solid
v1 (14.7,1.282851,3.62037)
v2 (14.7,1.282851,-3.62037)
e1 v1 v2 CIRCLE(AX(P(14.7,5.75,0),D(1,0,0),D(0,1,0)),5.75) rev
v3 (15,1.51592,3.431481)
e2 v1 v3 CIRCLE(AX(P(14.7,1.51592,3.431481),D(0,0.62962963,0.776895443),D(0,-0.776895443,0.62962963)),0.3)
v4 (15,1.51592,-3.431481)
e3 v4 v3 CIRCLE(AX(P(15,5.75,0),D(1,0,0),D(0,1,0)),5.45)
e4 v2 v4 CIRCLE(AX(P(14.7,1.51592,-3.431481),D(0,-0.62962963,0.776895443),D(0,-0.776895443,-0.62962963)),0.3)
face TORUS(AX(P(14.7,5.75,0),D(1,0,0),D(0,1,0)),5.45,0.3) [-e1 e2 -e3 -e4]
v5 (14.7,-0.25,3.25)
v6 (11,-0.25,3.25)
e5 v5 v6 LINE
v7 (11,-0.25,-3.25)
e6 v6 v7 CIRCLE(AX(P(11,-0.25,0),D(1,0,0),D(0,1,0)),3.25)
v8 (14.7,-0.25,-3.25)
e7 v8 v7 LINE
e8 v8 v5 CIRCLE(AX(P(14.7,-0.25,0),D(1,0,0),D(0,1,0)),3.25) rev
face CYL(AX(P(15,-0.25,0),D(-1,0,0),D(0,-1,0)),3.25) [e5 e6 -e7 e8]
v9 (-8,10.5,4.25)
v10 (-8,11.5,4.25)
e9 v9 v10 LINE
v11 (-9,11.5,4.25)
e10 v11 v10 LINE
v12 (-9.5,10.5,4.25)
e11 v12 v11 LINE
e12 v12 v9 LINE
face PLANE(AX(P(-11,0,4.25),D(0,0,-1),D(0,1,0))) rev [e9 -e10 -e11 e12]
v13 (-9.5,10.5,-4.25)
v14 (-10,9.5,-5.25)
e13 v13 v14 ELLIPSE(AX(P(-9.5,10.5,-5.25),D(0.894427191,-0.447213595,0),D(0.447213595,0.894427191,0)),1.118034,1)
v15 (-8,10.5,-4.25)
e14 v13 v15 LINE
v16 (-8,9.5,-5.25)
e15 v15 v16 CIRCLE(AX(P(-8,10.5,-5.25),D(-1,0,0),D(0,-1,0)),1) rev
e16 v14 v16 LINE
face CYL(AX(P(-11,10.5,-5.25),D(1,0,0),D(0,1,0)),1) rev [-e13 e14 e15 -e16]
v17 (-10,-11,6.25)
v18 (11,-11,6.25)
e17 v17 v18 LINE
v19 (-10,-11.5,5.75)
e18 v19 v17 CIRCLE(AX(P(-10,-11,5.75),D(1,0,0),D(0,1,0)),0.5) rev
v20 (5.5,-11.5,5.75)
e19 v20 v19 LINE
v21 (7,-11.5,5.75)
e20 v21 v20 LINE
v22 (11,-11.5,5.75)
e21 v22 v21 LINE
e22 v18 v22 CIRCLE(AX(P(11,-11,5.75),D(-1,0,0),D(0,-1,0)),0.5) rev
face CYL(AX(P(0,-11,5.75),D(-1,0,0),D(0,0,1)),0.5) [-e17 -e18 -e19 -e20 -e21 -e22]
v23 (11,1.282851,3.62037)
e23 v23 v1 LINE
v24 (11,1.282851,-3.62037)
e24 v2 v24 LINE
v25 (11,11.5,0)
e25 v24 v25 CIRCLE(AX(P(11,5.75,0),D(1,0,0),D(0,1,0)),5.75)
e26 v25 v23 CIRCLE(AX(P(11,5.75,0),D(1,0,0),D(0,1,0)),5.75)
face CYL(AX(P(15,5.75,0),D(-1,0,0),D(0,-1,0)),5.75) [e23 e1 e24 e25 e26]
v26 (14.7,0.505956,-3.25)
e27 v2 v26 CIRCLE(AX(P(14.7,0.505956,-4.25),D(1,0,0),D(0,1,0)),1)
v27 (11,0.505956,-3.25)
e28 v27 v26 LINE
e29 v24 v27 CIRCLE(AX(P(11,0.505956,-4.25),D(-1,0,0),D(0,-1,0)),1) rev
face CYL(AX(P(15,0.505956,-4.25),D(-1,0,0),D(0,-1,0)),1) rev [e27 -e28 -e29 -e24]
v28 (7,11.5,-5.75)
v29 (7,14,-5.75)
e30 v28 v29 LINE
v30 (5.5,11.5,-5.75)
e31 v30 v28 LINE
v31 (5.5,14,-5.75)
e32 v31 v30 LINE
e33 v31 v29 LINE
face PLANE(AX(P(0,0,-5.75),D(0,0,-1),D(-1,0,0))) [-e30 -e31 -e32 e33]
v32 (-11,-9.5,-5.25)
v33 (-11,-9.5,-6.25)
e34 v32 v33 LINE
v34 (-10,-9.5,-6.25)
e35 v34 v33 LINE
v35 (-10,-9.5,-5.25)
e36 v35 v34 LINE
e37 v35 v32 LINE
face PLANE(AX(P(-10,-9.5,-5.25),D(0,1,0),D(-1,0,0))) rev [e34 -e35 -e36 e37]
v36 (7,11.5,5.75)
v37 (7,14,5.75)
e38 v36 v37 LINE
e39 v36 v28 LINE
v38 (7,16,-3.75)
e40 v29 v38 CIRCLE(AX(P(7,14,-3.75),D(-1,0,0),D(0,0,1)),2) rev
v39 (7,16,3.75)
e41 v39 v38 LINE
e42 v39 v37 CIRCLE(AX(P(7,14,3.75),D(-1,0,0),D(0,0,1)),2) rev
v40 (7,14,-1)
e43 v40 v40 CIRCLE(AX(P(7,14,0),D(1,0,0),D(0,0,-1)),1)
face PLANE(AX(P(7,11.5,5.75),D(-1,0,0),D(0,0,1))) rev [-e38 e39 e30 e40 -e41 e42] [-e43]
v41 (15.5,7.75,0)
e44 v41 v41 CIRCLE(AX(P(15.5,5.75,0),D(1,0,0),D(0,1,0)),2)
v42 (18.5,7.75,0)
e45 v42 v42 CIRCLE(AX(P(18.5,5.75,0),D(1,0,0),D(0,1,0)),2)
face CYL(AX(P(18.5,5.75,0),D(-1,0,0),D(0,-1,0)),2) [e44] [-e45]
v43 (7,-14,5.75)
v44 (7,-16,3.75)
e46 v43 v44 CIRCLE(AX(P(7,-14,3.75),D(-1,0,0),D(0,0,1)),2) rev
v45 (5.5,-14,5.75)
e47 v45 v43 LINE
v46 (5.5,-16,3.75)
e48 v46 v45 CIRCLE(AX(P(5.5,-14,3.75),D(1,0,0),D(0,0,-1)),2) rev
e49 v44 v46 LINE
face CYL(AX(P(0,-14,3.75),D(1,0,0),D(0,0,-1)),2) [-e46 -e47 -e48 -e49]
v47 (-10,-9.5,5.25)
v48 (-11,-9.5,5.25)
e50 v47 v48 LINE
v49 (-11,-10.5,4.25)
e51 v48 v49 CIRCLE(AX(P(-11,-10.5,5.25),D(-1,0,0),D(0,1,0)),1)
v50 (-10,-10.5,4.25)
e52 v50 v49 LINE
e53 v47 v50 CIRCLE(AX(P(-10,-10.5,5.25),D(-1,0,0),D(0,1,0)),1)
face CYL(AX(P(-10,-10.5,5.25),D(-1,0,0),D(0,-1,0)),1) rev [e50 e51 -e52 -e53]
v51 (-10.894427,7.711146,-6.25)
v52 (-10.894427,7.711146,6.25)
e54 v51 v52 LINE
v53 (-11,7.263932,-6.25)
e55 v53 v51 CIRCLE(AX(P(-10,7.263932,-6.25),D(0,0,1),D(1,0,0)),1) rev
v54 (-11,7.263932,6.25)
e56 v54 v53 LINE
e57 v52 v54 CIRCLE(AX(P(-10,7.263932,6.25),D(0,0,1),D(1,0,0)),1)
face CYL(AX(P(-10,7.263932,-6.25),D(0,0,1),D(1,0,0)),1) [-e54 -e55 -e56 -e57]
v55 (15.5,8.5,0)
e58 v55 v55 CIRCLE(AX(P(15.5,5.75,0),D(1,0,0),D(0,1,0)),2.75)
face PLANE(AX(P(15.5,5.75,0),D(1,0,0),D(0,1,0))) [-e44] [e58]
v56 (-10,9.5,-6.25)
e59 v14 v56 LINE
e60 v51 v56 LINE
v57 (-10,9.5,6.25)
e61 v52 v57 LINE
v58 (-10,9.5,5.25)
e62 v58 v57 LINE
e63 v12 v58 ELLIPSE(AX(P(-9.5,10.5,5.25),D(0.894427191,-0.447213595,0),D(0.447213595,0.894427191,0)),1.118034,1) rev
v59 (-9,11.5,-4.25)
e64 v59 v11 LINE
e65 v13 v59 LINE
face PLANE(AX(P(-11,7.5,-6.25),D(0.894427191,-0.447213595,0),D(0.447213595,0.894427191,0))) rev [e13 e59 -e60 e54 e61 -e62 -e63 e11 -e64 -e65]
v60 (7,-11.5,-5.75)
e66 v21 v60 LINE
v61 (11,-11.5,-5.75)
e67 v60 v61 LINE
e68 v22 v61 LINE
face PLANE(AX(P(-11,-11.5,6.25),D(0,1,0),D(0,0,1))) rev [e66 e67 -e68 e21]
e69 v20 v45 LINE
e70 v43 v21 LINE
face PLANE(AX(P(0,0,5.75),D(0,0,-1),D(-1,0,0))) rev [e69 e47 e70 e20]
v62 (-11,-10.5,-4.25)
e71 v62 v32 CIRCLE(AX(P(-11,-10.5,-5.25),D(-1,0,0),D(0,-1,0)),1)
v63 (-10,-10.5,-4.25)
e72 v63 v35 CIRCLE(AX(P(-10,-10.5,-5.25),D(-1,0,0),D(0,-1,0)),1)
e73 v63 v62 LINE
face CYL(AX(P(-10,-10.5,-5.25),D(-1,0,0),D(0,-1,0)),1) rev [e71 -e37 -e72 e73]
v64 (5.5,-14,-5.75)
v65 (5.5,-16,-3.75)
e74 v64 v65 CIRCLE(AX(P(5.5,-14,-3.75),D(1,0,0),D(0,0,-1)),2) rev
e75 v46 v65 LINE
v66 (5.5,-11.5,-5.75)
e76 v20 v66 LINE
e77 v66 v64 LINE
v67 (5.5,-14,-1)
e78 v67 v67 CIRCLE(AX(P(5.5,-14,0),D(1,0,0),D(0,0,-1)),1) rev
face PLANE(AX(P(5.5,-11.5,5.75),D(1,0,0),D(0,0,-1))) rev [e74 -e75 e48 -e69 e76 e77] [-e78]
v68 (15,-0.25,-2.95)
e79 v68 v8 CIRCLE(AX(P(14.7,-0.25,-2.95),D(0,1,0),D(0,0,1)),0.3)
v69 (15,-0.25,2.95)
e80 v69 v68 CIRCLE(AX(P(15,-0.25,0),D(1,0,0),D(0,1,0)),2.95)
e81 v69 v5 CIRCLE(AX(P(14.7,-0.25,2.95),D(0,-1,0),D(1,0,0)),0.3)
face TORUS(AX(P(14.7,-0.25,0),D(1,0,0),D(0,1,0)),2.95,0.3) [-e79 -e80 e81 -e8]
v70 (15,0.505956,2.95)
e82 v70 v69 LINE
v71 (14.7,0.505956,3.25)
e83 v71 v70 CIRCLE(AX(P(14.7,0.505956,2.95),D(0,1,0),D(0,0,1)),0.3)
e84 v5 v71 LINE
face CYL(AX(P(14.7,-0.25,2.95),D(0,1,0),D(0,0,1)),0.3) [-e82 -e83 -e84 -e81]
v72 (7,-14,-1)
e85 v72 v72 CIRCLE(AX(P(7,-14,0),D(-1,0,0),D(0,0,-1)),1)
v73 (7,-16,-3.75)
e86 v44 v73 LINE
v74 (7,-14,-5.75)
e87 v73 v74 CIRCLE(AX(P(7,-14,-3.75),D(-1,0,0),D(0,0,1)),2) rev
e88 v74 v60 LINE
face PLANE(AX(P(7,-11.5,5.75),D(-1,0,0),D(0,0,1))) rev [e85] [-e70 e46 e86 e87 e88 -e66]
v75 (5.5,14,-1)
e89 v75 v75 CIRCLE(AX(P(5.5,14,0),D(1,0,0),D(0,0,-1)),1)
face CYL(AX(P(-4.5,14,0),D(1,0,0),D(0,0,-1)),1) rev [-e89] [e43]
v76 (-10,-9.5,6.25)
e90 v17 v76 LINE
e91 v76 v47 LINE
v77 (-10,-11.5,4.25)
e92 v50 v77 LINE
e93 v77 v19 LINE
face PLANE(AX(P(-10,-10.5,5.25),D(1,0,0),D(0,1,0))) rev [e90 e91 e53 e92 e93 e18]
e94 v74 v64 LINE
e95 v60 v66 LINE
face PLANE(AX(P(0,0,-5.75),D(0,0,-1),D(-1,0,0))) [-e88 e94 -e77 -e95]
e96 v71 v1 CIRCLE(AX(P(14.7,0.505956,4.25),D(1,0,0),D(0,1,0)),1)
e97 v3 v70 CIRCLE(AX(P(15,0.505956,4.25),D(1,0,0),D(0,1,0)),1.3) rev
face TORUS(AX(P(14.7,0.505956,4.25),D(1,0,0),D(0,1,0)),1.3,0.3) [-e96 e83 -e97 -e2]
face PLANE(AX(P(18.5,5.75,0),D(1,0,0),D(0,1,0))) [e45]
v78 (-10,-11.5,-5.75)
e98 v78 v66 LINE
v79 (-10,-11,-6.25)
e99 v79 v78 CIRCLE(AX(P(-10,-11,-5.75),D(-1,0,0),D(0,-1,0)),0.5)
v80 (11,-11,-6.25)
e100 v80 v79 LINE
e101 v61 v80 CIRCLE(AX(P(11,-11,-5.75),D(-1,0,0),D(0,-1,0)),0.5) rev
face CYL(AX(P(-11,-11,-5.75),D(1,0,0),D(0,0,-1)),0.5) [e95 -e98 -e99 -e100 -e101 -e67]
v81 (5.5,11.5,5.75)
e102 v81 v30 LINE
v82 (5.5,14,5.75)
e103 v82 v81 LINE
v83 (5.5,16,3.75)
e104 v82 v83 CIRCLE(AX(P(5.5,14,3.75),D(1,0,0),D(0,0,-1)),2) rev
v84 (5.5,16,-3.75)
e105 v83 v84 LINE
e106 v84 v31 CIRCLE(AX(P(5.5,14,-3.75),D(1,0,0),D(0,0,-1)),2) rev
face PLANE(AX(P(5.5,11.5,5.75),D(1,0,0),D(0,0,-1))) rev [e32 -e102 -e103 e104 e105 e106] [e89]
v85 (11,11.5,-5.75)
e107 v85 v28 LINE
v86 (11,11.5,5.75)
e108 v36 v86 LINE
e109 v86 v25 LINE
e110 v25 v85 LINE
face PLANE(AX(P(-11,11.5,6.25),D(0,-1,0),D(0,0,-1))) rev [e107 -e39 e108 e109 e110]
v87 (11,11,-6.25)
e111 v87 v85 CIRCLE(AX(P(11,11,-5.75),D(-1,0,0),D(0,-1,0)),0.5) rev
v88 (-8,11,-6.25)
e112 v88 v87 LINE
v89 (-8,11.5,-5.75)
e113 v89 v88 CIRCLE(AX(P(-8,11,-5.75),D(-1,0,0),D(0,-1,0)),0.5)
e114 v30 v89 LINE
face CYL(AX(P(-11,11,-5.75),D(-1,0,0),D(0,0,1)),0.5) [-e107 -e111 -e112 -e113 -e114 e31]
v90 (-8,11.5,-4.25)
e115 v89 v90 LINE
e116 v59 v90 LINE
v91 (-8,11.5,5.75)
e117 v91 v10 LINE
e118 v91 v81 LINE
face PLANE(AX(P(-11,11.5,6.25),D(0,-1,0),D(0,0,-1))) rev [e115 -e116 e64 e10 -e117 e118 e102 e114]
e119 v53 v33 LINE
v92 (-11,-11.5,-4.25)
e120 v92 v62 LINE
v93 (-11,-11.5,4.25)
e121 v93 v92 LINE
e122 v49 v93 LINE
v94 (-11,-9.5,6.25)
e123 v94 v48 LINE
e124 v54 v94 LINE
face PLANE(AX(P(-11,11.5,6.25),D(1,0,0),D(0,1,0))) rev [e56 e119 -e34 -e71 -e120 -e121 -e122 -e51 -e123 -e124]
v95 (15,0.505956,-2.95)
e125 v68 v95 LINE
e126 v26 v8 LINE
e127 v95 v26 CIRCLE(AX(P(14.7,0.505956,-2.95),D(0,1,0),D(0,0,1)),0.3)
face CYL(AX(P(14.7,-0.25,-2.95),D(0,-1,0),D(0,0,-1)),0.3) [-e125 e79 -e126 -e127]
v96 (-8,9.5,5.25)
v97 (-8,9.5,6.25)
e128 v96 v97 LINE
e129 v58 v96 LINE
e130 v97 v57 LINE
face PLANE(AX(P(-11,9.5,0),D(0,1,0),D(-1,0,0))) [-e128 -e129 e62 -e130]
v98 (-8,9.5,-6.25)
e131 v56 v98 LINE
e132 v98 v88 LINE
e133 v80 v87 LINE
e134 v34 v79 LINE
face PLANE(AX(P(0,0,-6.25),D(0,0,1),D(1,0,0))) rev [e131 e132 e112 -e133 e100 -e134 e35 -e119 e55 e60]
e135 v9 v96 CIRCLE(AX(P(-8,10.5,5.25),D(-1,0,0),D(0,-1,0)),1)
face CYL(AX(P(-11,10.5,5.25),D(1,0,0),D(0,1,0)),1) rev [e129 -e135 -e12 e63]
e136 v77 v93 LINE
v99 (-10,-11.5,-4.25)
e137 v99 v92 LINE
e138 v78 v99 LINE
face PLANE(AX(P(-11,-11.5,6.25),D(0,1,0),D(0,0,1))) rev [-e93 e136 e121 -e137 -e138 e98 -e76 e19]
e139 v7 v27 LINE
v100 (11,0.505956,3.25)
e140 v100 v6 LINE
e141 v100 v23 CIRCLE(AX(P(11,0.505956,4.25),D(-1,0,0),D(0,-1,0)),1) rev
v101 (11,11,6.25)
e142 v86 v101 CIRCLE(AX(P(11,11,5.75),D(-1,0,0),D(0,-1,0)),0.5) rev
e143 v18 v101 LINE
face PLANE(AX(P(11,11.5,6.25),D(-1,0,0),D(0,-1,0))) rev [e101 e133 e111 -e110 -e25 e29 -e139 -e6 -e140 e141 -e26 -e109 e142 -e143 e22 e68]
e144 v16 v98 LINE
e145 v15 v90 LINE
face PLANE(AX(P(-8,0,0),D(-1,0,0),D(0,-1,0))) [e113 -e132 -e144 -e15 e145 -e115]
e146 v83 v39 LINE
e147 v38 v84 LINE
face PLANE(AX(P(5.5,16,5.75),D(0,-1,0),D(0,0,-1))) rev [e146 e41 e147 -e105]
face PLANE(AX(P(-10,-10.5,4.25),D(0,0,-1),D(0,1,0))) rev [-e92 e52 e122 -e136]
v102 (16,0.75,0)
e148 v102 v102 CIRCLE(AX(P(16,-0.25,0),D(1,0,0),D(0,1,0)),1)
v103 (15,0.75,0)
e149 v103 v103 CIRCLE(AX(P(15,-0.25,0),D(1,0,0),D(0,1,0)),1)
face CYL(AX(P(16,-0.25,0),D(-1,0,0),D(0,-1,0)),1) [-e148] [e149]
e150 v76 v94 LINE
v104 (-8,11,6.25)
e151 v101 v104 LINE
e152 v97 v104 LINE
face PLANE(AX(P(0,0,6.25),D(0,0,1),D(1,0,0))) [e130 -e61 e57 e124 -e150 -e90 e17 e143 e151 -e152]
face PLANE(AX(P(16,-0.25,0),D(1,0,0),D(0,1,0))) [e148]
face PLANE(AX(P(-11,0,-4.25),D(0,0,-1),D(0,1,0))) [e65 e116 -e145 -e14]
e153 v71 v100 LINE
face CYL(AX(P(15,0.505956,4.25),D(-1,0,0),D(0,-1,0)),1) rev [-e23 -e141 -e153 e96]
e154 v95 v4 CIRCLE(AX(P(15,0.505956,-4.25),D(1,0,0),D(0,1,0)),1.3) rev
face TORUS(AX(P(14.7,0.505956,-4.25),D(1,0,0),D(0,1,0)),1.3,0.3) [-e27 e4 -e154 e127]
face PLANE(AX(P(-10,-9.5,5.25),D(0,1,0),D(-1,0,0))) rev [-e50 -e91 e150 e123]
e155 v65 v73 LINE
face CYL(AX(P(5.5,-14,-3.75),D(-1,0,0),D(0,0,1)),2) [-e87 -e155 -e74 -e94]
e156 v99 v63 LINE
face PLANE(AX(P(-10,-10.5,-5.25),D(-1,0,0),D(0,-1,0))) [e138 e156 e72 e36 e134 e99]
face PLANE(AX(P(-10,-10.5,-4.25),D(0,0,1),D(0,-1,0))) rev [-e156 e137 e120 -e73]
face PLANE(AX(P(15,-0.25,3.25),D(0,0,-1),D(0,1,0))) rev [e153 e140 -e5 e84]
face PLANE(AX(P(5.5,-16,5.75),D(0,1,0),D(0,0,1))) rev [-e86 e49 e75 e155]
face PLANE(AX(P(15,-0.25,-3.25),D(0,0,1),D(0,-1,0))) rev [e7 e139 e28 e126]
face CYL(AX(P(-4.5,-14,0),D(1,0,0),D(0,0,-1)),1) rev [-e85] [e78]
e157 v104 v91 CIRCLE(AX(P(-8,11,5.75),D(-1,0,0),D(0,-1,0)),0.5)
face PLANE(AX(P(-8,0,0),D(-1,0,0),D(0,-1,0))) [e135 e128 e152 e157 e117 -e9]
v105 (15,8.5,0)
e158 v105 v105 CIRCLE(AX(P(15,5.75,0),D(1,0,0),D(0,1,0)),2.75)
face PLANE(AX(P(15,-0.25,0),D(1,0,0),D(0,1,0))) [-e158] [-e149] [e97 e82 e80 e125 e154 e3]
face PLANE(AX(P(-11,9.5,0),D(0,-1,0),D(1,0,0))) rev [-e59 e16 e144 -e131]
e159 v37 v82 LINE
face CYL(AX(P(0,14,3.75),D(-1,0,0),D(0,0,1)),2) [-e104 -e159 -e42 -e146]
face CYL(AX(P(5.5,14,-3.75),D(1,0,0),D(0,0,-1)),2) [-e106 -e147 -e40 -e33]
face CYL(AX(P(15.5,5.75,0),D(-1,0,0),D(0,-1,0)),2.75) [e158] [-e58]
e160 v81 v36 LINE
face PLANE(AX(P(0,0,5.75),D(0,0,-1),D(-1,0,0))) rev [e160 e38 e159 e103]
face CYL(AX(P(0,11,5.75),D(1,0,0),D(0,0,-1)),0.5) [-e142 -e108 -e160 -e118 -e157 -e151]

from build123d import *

# Parameters (mm, degrees)
SKETCH1_W           = 22
SKETCH1_H           = 23
EXTRUDE1_DEPTH      = 6.25
EXTRUDE2_DEPTH      = 4
SKETCH3_R           = 2
EXTRUDE3_DEPTH      = 3.5
EXTRUDE4_DEPTH      = 26.11473671
FILLET1_R           = 1
SKETCH5_R           = 1
EXTRUDE5_DEPTH      = 1
SKETCH6_R           = 2.75
EXTRUDE6_DEPTH      = 0.5
EXTRUDE7_DEPTH      = 1
EXTRUDE8_DEPTH      = 33.273247435
EXTRUDE8_DEPTH_BACK = 1
EXTRUDE8_START      = -2
SKETCH8_W           = 1.5
SKETCH8_H           = 4.5
EXTRUDE9_DEPTH      = 5.75
FILLET3_R           = 0.3
FILLET4_R           = 0.5
FILLET5_R           = 2
SKETCH9_R           = 1
EXTRUDE10_DEPTH     = 11.5


with BuildPart() as part:
    # Sketch1 → Extrude1 (new, symmetric)
    with BuildSketch(Plane.XY):
        Rectangle(SKETCH1_W, SKETCH1_H)
    extrude(amount=EXTRUDE1_DEPTH, both=True)

    # Sketch2 → Extrude2 (add)
    with BuildSketch(Plane(origin=(11, 0, 0), x_dir=(0, 0, -1), z_dir=(1, 0, 0))):
        with BuildLine():
            Line((-3.25, -0.25), (-3.25, 1.00658351))
            ThreePointArc((-3.25, 1.00658351), (0, 11.5), (3.25, 1.00658351))
            Line((3.25, 1.00658351), (3.25, -0.25))
            ThreePointArc((3.25, -0.25), (0, -3.5), (-3.25, -0.25))
        make_face()
    extrude(amount=EXTRUDE2_DEPTH)

    # Sketch3 → Extrude3 (add)
    with BuildSketch(Plane(origin=(15, 0, 0), x_dir=(0, 0, -1), z_dir=(1, 0, 0))):
        with Locations(Location((0, 5.75, 0), (0, 0, 90))):
            Circle(SKETCH3_R)
    extrude(amount=EXTRUDE3_DEPTH)

    # Sketch4 → Extrude4 (cut, through all)
    with BuildSketch(Plane.XY.offset(6.25)):
        Polygon((-9, 11.5), (-11, 11.5), (-11, 7.5), align=None)
    extrude(amount=-EXTRUDE4_DEPTH, mode=Mode.SUBTRACT)

    # Fillet1
    fillet1_edges = [part.edges().sort_by_distance(p)[0] for p in [
        (13, 1.00658351, -3.25),
        (13, 1.00658351, 3.25),
        (-11, 7.5, 0),
    ]]
    fillet(fillet1_edges, radius=FILLET1_R)

    # Sketch5 → Extrude5 (add)
    with BuildSketch(Plane(origin=(15, 0, 0), x_dir=(0, 0, -1), z_dir=(1, 0, 0))):
        with Locations(Location((0, -0.25, 0), (0, 0, 90))):
            Circle(SKETCH5_R)
    extrude(amount=EXTRUDE5_DEPTH)

    # Sketch6 → Extrude6 (add)
    with BuildSketch(Plane(origin=(15, 0, 0), x_dir=(0, 0, -1), z_dir=(1, 0, 0))):
        with Locations(Location((0, 5.75, 0), (0, 0, 90))):
            Circle(SKETCH6_R)
    extrude(amount=EXTRUDE6_DEPTH)

    # Sketch7 → Extrude7 (cut)
    with BuildSketch(Plane.ZY.offset(11)):
        with BuildLine():
            Line((-5.25, -9.5), (-6.25, -9.5))
            Line((-6.25, -9.5), (-6.25, -11.5))
            Line((-6.25, -11.5), (-4.25, -11.5))
            Line((-4.25, -11.5), (-4.25, -10.5))
            ThreePointArc((-4.25, -10.5), (-4.542893219, -9.792893219), (-5.25, -9.5))
        make_face()
        with BuildLine():
            Line((6.25, -11.5), (4.25, -11.5))
            Line((4.25, -11.5), (4.25, -10.5))
            ThreePointArc((4.25, -10.5), (4.542893219, -9.792893219), (5.25, -9.5))
            Line((5.25, -9.5), (6.25, -9.5))
            Line((6.25, -9.5), (6.25, -11.5))
        make_face()
        with BuildLine():
            Line((5.25, 9.5), (6.25, 9.5))
            Line((6.25, 9.5), (6.25, 11.5))
            Line((6.25, 11.5), (4.25, 11.5))
            Line((4.25, 11.5), (4.25, 10.5))
            ThreePointArc((4.25, 10.5), (4.542893219, 9.792893219), (5.25, 9.5))
        make_face()
        with BuildLine():
            Line((-6.25, 11.5), (-4.25, 11.5))
            Line((-4.25, 11.5), (-4.25, 10.5))
            ThreePointArc((-4.25, 10.5), (-4.542893219, 9.792893219), (-5.25, 9.5))
            Line((-5.25, 9.5), (-6.25, 9.5))
            Line((-6.25, 9.5), (-6.25, 11.5))
        make_face()
    extrude(amount=-EXTRUDE7_DEPTH, mode=Mode.SUBTRACT)

    # Sketch → Extrude8 (cut, two sides: drawn at the far end of the back side and taken through both)
    with BuildSketch(Plane.ZY.offset(11).offset(EXTRUDE8_START - EXTRUDE8_DEPTH_BACK)):
        with BuildLine():
            ThreePointArc((-4.25, 10.5), (-4.542893219, 9.792893219), (-5.25, 9.5))
            Line((-5.25, 9.5), (-6.25, 9.5))
            Line((-6.25, 9.5), (-6.25, 11.5))
            Line((-6.25, 11.5), (-4.25, 11.5))
            Line((-4.25, 11.5), (-4.25, 10.5))
        make_face()
        with BuildLine():
            Line((4.25, 10.5), (4.25, 11.5))
            Line((4.25, 11.5), (6.25, 11.5))
            Line((6.25, 11.5), (6.25, 9.5))
            Line((6.25, 9.5), (5.25, 9.5))
            ThreePointArc((5.25, 9.5), (4.542893219, 9.792893219), (4.25, 10.5))
        make_face()
    extrude(amount=EXTRUDE8_DEPTH + EXTRUDE8_DEPTH_BACK, mode=Mode.SUBTRACT)

    # Sketch8 → Extrude9 (add, symmetric)
    with BuildSketch(Plane.XY):
        with Locations((6.25, 13.75)):
            Rectangle(SKETCH8_W, SKETCH8_H)
        with Locations((6.25, -13.75)):
            Rectangle(SKETCH8_W, SKETCH8_H)
    extrude(amount=EXTRUDE9_DEPTH, both=True)

    # Fillet3
    fillet3_edges = [part.edges().sort_by_distance(p)[0] for p in [
        (15, -3.5, 0),
        (15, 0.12797788, -3.25),
        (15, 11.5, 0),
        (15, 0.12797788, 3.25),
        (15, 0.936287242, -3.347329066),
        (15, 0.936287242, 3.347329066),
    ]]
    fillet(fillet3_edges, radius=FILLET3_R)

    # Fillet4
    fillet4_edges = [part.edges().sort_by_distance(p)[0] for p in [
        (1.5, 11.5, -6.25),
        (1.5, 11.5, 6.25),
        (0.5, -11.5, -6.25),
        (0.5, -11.5, 6.25),
    ]]
    fillet(fillet4_edges, radius=FILLET4_R - 0.0001)  # a hair under: the kernel refuses the full size

    # Fillet5
    fillet5_edges = [part.edges().sort_by_distance(p)[0] for p in [
        (6.25, 16, -5.75),
        (6.25, 16, 5.75),
        (6.25, -16, -5.75),
        (6.25, -16, 5.75),
    ]]
    fillet(fillet5_edges, radius=FILLET5_R)

    # Sketch9 → Extrude10 (cut)
    with BuildSketch(Plane(origin=(7, 0, 0), x_dir=(0, 0, -1), z_dir=(1, 0, 0))):
        with Locations((0, 14)):
            Circle(SKETCH9_R)
    extrude10 = extrude(amount=-EXTRUDE10_DEPTH, mode=Mode.SUBTRACT)

    # Mirror1: Extrude10 across plane
    add(extrude10.mirror(Plane.ZX), mode=Mode.SUBTRACT)


solid = part.part
